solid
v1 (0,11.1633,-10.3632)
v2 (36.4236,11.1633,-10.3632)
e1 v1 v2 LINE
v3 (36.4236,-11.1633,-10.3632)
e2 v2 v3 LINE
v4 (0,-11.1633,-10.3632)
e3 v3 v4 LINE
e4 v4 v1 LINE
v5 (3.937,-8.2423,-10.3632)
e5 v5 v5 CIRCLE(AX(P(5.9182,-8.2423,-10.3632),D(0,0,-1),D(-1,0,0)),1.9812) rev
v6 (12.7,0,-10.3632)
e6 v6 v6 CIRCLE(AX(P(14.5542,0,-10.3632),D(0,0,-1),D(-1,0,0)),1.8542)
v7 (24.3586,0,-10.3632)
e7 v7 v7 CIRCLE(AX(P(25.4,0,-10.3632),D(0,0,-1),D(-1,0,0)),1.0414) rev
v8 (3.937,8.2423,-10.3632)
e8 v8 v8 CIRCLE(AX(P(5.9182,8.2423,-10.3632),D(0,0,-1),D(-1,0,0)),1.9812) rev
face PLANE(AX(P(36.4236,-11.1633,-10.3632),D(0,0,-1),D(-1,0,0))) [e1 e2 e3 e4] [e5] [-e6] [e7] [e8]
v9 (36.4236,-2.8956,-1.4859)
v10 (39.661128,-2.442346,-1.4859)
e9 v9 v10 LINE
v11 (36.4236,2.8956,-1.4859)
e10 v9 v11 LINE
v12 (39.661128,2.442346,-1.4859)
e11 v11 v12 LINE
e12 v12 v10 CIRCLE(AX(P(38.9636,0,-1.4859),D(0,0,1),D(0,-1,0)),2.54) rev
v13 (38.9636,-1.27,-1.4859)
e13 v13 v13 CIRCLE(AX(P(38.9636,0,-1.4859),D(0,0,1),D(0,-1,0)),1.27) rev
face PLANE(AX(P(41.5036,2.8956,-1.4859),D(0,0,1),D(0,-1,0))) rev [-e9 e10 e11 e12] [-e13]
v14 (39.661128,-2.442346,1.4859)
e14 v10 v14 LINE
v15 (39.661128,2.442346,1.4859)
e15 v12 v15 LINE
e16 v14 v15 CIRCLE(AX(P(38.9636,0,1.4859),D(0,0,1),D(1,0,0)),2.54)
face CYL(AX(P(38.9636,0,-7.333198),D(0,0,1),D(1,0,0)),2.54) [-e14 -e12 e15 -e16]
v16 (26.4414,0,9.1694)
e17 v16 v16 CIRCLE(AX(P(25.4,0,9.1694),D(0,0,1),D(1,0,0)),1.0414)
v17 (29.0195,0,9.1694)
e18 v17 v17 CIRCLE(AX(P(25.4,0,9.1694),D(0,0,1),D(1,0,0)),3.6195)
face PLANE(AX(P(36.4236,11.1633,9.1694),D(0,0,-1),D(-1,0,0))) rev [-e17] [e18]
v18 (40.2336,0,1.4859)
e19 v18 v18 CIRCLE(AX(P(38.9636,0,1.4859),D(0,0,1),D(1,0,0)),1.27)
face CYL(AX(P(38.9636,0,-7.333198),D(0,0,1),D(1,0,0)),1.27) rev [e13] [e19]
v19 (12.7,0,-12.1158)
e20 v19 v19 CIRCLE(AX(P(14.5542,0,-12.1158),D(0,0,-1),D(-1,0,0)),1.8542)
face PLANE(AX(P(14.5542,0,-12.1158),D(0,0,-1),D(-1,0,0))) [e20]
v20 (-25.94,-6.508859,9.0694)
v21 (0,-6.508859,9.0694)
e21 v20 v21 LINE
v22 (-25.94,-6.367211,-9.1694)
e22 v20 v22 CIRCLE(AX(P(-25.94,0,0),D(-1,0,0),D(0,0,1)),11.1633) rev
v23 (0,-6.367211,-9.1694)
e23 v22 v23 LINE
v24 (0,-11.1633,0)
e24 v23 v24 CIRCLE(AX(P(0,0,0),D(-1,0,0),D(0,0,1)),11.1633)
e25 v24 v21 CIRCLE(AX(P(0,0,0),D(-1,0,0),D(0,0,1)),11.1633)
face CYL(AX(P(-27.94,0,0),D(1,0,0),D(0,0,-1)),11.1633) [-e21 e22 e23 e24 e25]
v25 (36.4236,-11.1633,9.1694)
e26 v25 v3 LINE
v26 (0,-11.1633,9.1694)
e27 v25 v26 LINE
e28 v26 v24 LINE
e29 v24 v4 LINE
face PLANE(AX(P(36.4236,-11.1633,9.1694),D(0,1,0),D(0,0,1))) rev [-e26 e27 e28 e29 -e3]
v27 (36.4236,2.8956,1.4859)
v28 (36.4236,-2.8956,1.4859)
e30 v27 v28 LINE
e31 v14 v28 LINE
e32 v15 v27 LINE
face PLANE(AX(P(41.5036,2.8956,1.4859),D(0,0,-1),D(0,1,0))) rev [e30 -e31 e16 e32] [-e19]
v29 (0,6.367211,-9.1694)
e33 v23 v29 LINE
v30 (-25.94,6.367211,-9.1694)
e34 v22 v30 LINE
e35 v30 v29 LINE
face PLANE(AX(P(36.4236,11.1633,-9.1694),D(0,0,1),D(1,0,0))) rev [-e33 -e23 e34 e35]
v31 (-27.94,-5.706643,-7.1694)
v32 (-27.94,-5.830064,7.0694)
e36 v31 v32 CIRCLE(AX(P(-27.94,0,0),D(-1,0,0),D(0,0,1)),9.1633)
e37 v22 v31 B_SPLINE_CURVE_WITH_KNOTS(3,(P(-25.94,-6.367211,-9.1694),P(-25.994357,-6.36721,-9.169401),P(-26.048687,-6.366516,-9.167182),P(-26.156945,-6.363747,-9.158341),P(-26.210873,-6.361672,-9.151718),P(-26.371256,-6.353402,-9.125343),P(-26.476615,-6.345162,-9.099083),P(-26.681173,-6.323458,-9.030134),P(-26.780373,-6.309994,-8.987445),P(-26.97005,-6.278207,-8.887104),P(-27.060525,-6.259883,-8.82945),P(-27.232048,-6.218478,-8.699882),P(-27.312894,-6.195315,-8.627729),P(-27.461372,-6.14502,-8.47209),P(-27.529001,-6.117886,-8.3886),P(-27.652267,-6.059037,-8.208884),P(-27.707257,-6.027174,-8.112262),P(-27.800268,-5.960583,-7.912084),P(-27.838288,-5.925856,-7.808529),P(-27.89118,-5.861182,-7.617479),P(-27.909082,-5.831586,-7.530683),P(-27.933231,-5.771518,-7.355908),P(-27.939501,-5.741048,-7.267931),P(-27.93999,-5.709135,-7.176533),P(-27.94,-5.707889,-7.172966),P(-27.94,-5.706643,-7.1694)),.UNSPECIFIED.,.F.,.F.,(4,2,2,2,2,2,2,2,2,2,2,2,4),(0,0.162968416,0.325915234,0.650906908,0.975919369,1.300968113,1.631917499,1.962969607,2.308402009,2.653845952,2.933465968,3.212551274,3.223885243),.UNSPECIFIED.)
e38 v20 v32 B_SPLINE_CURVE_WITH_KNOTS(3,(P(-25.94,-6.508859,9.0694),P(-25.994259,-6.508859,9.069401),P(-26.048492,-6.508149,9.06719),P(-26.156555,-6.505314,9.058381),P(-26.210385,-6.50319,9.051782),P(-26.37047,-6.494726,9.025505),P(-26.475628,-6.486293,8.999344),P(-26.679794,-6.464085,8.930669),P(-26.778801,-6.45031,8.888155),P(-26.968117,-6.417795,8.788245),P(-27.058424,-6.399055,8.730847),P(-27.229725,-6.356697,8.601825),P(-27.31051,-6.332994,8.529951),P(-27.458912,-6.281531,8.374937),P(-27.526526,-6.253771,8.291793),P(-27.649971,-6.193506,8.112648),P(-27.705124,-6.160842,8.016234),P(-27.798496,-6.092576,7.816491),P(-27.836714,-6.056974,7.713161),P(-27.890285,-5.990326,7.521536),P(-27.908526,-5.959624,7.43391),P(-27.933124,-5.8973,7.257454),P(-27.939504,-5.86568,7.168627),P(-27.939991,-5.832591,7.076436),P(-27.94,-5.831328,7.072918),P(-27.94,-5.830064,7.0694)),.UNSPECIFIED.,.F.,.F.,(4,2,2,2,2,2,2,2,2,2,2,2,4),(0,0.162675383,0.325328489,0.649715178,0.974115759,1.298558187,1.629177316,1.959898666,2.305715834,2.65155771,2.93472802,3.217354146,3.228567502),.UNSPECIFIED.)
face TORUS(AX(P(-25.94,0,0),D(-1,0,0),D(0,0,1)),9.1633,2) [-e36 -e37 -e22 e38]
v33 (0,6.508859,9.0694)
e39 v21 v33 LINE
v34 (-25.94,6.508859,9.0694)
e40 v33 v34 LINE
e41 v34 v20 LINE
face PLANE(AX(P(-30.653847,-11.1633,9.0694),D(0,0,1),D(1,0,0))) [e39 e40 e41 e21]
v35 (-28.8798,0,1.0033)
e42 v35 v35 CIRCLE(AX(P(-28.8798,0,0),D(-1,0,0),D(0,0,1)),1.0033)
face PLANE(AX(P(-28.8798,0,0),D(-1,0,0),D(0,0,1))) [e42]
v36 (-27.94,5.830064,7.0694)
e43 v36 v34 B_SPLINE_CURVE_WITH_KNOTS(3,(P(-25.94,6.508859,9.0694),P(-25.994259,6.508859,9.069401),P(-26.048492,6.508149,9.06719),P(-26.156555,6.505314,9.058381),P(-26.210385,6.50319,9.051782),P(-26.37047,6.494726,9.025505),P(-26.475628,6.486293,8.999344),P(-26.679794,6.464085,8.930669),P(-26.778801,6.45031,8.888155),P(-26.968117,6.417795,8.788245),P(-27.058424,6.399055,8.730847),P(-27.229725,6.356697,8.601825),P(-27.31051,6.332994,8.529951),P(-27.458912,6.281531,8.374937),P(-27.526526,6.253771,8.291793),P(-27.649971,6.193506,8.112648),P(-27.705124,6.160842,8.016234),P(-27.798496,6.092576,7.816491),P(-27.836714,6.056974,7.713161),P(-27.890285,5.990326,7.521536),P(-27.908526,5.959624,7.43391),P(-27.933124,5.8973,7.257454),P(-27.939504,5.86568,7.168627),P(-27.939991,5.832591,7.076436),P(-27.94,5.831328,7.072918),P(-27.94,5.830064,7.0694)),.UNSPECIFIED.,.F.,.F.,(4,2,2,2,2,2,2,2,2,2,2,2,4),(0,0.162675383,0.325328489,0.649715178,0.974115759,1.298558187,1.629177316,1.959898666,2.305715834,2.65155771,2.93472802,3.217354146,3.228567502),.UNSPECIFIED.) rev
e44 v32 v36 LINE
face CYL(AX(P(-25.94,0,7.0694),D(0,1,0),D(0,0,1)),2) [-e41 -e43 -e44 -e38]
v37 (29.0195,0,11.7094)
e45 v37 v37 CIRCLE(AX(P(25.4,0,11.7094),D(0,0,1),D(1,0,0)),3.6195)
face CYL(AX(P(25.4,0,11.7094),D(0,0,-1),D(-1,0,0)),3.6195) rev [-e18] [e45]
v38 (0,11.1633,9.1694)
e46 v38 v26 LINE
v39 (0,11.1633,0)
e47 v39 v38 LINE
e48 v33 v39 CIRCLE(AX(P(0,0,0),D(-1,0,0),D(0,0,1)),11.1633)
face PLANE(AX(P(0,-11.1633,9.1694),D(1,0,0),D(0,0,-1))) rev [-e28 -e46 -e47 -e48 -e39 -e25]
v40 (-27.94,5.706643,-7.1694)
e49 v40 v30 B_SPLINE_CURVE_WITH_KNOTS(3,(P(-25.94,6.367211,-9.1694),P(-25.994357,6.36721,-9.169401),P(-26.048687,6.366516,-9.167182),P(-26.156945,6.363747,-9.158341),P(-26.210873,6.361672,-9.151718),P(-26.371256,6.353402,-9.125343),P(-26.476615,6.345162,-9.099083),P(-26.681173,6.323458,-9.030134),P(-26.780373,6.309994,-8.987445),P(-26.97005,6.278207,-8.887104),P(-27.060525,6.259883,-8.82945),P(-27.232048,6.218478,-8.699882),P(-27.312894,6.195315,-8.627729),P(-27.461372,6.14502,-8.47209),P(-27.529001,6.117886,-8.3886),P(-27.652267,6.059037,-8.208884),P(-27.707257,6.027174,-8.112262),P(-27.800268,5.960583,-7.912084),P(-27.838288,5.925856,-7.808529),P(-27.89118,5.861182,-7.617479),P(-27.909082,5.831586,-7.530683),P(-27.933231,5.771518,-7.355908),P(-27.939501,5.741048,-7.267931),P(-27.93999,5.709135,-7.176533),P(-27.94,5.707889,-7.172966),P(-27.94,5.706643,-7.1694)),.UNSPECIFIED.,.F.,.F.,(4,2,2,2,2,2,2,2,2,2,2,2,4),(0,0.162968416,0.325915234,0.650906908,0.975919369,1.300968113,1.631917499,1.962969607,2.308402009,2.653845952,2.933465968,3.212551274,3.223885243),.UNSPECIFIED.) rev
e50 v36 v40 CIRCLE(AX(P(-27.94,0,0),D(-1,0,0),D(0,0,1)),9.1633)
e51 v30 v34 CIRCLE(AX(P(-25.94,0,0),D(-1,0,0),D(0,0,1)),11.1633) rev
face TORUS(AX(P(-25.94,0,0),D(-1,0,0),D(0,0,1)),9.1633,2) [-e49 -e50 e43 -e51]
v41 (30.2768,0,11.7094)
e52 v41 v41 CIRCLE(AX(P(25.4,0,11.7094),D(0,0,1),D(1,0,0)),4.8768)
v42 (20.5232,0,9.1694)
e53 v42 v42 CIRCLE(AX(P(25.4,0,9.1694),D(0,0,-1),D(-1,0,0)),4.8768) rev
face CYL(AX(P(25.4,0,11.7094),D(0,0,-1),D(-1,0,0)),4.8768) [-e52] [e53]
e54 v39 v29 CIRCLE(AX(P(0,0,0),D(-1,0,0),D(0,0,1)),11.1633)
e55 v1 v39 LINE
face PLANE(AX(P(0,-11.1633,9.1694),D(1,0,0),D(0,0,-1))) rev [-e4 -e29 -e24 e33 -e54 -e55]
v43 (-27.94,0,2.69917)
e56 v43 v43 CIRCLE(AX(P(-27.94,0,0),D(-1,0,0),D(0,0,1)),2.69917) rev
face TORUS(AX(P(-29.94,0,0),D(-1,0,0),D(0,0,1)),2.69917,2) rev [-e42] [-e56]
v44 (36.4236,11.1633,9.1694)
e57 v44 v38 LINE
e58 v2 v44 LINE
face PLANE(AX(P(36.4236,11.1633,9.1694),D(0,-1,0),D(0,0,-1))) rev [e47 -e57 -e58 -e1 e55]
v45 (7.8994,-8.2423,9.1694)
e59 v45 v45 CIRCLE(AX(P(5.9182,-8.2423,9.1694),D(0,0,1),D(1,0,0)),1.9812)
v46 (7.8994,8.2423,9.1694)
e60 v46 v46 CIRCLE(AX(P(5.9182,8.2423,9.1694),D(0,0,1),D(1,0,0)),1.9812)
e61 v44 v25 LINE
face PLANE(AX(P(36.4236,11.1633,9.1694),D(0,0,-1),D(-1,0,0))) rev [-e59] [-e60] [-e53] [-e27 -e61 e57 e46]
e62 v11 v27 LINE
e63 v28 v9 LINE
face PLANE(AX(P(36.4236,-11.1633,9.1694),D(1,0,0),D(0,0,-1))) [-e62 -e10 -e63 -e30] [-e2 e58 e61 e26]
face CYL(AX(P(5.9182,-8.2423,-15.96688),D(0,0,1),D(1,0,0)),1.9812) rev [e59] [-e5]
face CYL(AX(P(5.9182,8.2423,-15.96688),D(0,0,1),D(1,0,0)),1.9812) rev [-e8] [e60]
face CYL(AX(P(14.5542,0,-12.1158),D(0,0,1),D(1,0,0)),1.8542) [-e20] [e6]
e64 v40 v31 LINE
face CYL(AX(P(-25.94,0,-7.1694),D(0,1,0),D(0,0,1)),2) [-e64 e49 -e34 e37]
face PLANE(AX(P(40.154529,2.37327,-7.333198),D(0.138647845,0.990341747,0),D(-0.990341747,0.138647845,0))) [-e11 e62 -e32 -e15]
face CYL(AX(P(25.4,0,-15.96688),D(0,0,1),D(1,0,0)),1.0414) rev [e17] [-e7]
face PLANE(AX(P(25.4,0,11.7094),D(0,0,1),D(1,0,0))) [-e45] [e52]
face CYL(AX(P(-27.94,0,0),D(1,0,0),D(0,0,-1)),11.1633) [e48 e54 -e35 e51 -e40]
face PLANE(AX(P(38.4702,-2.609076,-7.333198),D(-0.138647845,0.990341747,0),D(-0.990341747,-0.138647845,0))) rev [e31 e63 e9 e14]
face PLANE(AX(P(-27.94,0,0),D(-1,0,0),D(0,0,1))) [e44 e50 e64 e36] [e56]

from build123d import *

# Parameters (mm, degrees)
SKETCH1_W           = 18.3388
SKETCH1_H           = 22.3266
BOSS_EXTRUDE1_DEPTH = 36.4236
BOSS_EXTRUDE2_DEPTH = 27.94
SKETCH3_R           = 1.0033
BOSS_EXTRUDE3_DEPTH = 0.9398
SKETCH4_W           = 2.9718
SKETCH4_H           = 5.7912
BOSS_EXTRUDE4_DEPTH = 5.08
SKETCH5_R           = 1.27
CUT_EXTRUDE3_DEPTH  = 2.9718
SKETCH7_R           = 4.8768
SKETCH7_R_2         = 3.6195
BOSS_EXTRUDE5_DEPTH = 2.54
SKETCH9_W           = 36.4236
SKETCH9_H           = 22.3266
BOSS_EXTRUDE6_DEPTH = 1.1938
SKETCH8_R           = 1.0414
SKETCH8_R_2         = 1.9812
CUT_EXTRUDE4_DEPTH  = 19.5326
SKETCH10_R          = 1.8542
BOSS_EXTRUDE7_DEPTH = 1.7526
SKETCH11_W          = 30.653846682
SKETCH11_H          = 27.216421179
CUT_EXTRUDE5_DEPTH  = 0.1
FILLET1_R           = 2


with BuildPart() as part:
    # Sketch1 → Boss-Extrude1 (new body)
    with BuildSketch(Plane(origin=(0, 0, 0), x_dir=(0, 0, -1), z_dir=(1, 0, 0))):
        Rectangle(SKETCH1_W, SKETCH1_H)
    extrude(amount=BOSS_EXTRUDE1_DEPTH)

    # Sketch2 → Boss-Extrude2 (add)
    with BuildSketch(Plane.ZY):
        with BuildLine():
            Line((-9.1694, -6.367210577), (-9.1694, 6.367210577))
            ThreePointArc((-9.1694, 6.367210577), (0, 11.1633), (9.1694, 6.367210577))
            Line((9.1694, 6.367210577), (9.1694, -6.367210577))
            ThreePointArc((9.1694, -6.367210577), (0, -11.1633), (-9.1694, -6.367210577))
        make_face()
    extrude(amount=BOSS_EXTRUDE2_DEPTH)

    # Sketch3 → Boss-Extrude3 (add)
    with BuildSketch(Plane.ZY.offset(27.94)):
        Circle(SKETCH3_R)
    extrude(amount=BOSS_EXTRUDE3_DEPTH)

    # Sketch4 → Boss-Extrude4 (add)
    with BuildSketch(Plane(origin=(36.4236, 0, 0), x_dir=(0, 0, -1), z_dir=(1, 0, 0))):
        Rectangle(SKETCH4_W, SKETCH4_H)
    extrude(amount=BOSS_EXTRUDE4_DEPTH)

    # Sketch5 → Cut-Extrude3 (cut)
    with BuildSketch(Plane.XY.offset(1.4859)):
        with BuildLine():
            Line((36.4236, 2.8956), (39.661128443, 2.442346018))
            ThreePointArc((39.661128443, 2.442346018), (40.991323146, 1.529685864), (41.5036, -2.8e-08))
            Line((41.5036, -2.8e-08), (41.5036, 2.8956))
            Line((41.5036, 2.8956), (36.4236, 2.8956))
        make_face()
        with BuildLine():
            Line((41.5036, -2.8956), (41.5036, -2.8e-08))
            ThreePointArc((41.5036, -2.8e-08), (40.991323129, -1.529685887), (39.661128443, -2.442346018))
            Line((39.661128443, -2.442346018), (36.4236, -2.8956))
            Line((36.4236, -2.8956), (41.5036, -2.8956))
        make_face()
        with Locations((38.9636, 0)):
            Circle(SKETCH5_R)
    extrude(amount=-CUT_EXTRUDE3_DEPTH, mode=Mode.SUBTRACT)

    # Sketch7 → Boss-Extrude5 (add)
    with BuildSketch(Plane.XY.offset(9.1694)):
        with Locations(Location((25.4, 0, 0), (0, 0, 180))):
            Circle(SKETCH7_R)
        with Locations((25.4, 0)):
            Circle(SKETCH7_R_2, mode=Mode.SUBTRACT)
    extrude(amount=BOSS_EXTRUDE5_DEPTH)

    # Sketch9 → Boss-Extrude6 (add)
    with BuildSketch(Plane(origin=(0, 0, -9.1694), x_dir=(-1, 0, 0), z_dir=(0, 0, -1))):
        with Locations((-18.2118, 0)):
            Rectangle(SKETCH9_W, SKETCH9_H)
    extrude(amount=BOSS_EXTRUDE6_DEPTH)

    # Sketch8 → Cut-Extrude4 (cut)
    with BuildSketch(Plane.XY.offset(9.1694)):
        with Locations((25.4, 0)):
            Circle(SKETCH8_R)
        with Locations((5.9182, 8.2423)):
            Circle(SKETCH8_R_2)
        with Locations((5.9182, -8.2423)):
            Circle(SKETCH8_R_2)
    extrude(amount=-CUT_EXTRUDE4_DEPTH, mode=Mode.SUBTRACT)

    # Sketch10 → Boss-Extrude7 (add)
    with BuildSketch(Plane(origin=(0, 0, -10.3632), x_dir=(-1, 0, 0), z_dir=(0, 0, -1))):
        with Locations((-14.5542, 0)):
            Circle(SKETCH10_R)
    extrude(amount=BOSS_EXTRUDE7_DEPTH)

    # Sketch11 → Cut-Extrude5 (cut)
    with BuildSketch(Plane.XY.offset(9.1694)):
        with Locations((-15.326923341, 2.44491059)):
            Rectangle(SKETCH11_W, SKETCH11_H)
    extrude(amount=-CUT_EXTRUDE5_DEPTH, mode=Mode.SUBTRACT)

    # Fillet1
    # the kernel refuses this fillet: 2 mm, written as the material it adds along each edge
    with BuildSketch(Plane(origin=(-27.94, 0, 0), x_dir=(0, 0, 1), z_dir=(0, -1, 0))) as fillet1_piece_1:
        with BuildLine():
            CenterArc((2.699170266, 2), FILLET1_R, 212.012211673, 57.987788327)
            Line((1.0033, 0.9398), (1.0033, 0))
            Line((1.0033, 0), (2.699170266, 0))
        make_face()
    revolve(axis=Axis((-27.94, 0, 0), (-1, 0, 0)))
    # the kernel refuses this fillet: 2 mm, written as the material it takes off along each edge
    with BuildSketch(Plane(origin=(-27.94, -11.367210577, -9.1694), x_dir=(1, 0, 0), z_dir=(0, 1, 0))) as fillet1_2_piece_1:
        with BuildLine():
            CenterArc((FILLET1_R, -FILLET1_R), FILLET1_R, 90, 90)
            Line((0, -FILLET1_R), (0, 0))
            Line((0, 0), (FILLET1_R, 0))
        make_face()
    extrude(amount=22.734421154, mode=Mode.SUBTRACT)
    with BuildSketch(Plane(origin=(-27.94, 0, 0), x_dir=(0, 0.15812676738734943, -0.9874188196685473), z_dir=(0, -0.9874188196685473, -0.15812676738734943))) as fillet1_2_piece_2:
        with BuildLine():
            CenterArc((11.1633 - FILLET1_R, FILLET1_R), FILLET1_R, 270, 90)
            Line((11.1633 - FILLET1_R, 0), (11.1633, 0))
            Line((11.1633, 0), (11.1633, FILLET1_R))
        make_face()
    revolve(axis=Axis((-27.94, 0, 0), (1, 0, 0)), revolution_arc=178.888182092, mode=Mode.SUBTRACT)
    with BuildSketch(Plane(origin=(-27.94, -11.508859388, 9.0694), x_dir=(1, 0, 0), z_dir=(0, 1, 0))) as fillet1_2_piece_3:
        with BuildLine():
            CenterArc((FILLET1_R, FILLET1_R), FILLET1_R, 180, 90)
            Line((0, FILLET1_R), (0, 0))
            Line((0, 0), (FILLET1_R, 0))
        make_face()
    extrude(amount=23.017718776, mode=Mode.SUBTRACT)
    with BuildSketch(Plane(origin=(-27.94, 0, 0), x_dir=(0, 0.1389374526808322, 0.9903011583566695), z_dir=(0, 0.9903011583566695, -0.1389374526808322))) as fillet1_2_piece_4:
        with BuildLine():
            CenterArc((11.1633 - FILLET1_R, FILLET1_R), FILLET1_R, 270, 90)
            Line((11.1633 - FILLET1_R, 0), (11.1633, 0))
            Line((11.1633, 0), (11.1633, FILLET1_R))
        make_face()
    revolve(axis=Axis((-27.94, 0, 0), (1, 0, 0)), revolution_arc=178.888182092, mode=Mode.SUBTRACT)


solid = part.part
